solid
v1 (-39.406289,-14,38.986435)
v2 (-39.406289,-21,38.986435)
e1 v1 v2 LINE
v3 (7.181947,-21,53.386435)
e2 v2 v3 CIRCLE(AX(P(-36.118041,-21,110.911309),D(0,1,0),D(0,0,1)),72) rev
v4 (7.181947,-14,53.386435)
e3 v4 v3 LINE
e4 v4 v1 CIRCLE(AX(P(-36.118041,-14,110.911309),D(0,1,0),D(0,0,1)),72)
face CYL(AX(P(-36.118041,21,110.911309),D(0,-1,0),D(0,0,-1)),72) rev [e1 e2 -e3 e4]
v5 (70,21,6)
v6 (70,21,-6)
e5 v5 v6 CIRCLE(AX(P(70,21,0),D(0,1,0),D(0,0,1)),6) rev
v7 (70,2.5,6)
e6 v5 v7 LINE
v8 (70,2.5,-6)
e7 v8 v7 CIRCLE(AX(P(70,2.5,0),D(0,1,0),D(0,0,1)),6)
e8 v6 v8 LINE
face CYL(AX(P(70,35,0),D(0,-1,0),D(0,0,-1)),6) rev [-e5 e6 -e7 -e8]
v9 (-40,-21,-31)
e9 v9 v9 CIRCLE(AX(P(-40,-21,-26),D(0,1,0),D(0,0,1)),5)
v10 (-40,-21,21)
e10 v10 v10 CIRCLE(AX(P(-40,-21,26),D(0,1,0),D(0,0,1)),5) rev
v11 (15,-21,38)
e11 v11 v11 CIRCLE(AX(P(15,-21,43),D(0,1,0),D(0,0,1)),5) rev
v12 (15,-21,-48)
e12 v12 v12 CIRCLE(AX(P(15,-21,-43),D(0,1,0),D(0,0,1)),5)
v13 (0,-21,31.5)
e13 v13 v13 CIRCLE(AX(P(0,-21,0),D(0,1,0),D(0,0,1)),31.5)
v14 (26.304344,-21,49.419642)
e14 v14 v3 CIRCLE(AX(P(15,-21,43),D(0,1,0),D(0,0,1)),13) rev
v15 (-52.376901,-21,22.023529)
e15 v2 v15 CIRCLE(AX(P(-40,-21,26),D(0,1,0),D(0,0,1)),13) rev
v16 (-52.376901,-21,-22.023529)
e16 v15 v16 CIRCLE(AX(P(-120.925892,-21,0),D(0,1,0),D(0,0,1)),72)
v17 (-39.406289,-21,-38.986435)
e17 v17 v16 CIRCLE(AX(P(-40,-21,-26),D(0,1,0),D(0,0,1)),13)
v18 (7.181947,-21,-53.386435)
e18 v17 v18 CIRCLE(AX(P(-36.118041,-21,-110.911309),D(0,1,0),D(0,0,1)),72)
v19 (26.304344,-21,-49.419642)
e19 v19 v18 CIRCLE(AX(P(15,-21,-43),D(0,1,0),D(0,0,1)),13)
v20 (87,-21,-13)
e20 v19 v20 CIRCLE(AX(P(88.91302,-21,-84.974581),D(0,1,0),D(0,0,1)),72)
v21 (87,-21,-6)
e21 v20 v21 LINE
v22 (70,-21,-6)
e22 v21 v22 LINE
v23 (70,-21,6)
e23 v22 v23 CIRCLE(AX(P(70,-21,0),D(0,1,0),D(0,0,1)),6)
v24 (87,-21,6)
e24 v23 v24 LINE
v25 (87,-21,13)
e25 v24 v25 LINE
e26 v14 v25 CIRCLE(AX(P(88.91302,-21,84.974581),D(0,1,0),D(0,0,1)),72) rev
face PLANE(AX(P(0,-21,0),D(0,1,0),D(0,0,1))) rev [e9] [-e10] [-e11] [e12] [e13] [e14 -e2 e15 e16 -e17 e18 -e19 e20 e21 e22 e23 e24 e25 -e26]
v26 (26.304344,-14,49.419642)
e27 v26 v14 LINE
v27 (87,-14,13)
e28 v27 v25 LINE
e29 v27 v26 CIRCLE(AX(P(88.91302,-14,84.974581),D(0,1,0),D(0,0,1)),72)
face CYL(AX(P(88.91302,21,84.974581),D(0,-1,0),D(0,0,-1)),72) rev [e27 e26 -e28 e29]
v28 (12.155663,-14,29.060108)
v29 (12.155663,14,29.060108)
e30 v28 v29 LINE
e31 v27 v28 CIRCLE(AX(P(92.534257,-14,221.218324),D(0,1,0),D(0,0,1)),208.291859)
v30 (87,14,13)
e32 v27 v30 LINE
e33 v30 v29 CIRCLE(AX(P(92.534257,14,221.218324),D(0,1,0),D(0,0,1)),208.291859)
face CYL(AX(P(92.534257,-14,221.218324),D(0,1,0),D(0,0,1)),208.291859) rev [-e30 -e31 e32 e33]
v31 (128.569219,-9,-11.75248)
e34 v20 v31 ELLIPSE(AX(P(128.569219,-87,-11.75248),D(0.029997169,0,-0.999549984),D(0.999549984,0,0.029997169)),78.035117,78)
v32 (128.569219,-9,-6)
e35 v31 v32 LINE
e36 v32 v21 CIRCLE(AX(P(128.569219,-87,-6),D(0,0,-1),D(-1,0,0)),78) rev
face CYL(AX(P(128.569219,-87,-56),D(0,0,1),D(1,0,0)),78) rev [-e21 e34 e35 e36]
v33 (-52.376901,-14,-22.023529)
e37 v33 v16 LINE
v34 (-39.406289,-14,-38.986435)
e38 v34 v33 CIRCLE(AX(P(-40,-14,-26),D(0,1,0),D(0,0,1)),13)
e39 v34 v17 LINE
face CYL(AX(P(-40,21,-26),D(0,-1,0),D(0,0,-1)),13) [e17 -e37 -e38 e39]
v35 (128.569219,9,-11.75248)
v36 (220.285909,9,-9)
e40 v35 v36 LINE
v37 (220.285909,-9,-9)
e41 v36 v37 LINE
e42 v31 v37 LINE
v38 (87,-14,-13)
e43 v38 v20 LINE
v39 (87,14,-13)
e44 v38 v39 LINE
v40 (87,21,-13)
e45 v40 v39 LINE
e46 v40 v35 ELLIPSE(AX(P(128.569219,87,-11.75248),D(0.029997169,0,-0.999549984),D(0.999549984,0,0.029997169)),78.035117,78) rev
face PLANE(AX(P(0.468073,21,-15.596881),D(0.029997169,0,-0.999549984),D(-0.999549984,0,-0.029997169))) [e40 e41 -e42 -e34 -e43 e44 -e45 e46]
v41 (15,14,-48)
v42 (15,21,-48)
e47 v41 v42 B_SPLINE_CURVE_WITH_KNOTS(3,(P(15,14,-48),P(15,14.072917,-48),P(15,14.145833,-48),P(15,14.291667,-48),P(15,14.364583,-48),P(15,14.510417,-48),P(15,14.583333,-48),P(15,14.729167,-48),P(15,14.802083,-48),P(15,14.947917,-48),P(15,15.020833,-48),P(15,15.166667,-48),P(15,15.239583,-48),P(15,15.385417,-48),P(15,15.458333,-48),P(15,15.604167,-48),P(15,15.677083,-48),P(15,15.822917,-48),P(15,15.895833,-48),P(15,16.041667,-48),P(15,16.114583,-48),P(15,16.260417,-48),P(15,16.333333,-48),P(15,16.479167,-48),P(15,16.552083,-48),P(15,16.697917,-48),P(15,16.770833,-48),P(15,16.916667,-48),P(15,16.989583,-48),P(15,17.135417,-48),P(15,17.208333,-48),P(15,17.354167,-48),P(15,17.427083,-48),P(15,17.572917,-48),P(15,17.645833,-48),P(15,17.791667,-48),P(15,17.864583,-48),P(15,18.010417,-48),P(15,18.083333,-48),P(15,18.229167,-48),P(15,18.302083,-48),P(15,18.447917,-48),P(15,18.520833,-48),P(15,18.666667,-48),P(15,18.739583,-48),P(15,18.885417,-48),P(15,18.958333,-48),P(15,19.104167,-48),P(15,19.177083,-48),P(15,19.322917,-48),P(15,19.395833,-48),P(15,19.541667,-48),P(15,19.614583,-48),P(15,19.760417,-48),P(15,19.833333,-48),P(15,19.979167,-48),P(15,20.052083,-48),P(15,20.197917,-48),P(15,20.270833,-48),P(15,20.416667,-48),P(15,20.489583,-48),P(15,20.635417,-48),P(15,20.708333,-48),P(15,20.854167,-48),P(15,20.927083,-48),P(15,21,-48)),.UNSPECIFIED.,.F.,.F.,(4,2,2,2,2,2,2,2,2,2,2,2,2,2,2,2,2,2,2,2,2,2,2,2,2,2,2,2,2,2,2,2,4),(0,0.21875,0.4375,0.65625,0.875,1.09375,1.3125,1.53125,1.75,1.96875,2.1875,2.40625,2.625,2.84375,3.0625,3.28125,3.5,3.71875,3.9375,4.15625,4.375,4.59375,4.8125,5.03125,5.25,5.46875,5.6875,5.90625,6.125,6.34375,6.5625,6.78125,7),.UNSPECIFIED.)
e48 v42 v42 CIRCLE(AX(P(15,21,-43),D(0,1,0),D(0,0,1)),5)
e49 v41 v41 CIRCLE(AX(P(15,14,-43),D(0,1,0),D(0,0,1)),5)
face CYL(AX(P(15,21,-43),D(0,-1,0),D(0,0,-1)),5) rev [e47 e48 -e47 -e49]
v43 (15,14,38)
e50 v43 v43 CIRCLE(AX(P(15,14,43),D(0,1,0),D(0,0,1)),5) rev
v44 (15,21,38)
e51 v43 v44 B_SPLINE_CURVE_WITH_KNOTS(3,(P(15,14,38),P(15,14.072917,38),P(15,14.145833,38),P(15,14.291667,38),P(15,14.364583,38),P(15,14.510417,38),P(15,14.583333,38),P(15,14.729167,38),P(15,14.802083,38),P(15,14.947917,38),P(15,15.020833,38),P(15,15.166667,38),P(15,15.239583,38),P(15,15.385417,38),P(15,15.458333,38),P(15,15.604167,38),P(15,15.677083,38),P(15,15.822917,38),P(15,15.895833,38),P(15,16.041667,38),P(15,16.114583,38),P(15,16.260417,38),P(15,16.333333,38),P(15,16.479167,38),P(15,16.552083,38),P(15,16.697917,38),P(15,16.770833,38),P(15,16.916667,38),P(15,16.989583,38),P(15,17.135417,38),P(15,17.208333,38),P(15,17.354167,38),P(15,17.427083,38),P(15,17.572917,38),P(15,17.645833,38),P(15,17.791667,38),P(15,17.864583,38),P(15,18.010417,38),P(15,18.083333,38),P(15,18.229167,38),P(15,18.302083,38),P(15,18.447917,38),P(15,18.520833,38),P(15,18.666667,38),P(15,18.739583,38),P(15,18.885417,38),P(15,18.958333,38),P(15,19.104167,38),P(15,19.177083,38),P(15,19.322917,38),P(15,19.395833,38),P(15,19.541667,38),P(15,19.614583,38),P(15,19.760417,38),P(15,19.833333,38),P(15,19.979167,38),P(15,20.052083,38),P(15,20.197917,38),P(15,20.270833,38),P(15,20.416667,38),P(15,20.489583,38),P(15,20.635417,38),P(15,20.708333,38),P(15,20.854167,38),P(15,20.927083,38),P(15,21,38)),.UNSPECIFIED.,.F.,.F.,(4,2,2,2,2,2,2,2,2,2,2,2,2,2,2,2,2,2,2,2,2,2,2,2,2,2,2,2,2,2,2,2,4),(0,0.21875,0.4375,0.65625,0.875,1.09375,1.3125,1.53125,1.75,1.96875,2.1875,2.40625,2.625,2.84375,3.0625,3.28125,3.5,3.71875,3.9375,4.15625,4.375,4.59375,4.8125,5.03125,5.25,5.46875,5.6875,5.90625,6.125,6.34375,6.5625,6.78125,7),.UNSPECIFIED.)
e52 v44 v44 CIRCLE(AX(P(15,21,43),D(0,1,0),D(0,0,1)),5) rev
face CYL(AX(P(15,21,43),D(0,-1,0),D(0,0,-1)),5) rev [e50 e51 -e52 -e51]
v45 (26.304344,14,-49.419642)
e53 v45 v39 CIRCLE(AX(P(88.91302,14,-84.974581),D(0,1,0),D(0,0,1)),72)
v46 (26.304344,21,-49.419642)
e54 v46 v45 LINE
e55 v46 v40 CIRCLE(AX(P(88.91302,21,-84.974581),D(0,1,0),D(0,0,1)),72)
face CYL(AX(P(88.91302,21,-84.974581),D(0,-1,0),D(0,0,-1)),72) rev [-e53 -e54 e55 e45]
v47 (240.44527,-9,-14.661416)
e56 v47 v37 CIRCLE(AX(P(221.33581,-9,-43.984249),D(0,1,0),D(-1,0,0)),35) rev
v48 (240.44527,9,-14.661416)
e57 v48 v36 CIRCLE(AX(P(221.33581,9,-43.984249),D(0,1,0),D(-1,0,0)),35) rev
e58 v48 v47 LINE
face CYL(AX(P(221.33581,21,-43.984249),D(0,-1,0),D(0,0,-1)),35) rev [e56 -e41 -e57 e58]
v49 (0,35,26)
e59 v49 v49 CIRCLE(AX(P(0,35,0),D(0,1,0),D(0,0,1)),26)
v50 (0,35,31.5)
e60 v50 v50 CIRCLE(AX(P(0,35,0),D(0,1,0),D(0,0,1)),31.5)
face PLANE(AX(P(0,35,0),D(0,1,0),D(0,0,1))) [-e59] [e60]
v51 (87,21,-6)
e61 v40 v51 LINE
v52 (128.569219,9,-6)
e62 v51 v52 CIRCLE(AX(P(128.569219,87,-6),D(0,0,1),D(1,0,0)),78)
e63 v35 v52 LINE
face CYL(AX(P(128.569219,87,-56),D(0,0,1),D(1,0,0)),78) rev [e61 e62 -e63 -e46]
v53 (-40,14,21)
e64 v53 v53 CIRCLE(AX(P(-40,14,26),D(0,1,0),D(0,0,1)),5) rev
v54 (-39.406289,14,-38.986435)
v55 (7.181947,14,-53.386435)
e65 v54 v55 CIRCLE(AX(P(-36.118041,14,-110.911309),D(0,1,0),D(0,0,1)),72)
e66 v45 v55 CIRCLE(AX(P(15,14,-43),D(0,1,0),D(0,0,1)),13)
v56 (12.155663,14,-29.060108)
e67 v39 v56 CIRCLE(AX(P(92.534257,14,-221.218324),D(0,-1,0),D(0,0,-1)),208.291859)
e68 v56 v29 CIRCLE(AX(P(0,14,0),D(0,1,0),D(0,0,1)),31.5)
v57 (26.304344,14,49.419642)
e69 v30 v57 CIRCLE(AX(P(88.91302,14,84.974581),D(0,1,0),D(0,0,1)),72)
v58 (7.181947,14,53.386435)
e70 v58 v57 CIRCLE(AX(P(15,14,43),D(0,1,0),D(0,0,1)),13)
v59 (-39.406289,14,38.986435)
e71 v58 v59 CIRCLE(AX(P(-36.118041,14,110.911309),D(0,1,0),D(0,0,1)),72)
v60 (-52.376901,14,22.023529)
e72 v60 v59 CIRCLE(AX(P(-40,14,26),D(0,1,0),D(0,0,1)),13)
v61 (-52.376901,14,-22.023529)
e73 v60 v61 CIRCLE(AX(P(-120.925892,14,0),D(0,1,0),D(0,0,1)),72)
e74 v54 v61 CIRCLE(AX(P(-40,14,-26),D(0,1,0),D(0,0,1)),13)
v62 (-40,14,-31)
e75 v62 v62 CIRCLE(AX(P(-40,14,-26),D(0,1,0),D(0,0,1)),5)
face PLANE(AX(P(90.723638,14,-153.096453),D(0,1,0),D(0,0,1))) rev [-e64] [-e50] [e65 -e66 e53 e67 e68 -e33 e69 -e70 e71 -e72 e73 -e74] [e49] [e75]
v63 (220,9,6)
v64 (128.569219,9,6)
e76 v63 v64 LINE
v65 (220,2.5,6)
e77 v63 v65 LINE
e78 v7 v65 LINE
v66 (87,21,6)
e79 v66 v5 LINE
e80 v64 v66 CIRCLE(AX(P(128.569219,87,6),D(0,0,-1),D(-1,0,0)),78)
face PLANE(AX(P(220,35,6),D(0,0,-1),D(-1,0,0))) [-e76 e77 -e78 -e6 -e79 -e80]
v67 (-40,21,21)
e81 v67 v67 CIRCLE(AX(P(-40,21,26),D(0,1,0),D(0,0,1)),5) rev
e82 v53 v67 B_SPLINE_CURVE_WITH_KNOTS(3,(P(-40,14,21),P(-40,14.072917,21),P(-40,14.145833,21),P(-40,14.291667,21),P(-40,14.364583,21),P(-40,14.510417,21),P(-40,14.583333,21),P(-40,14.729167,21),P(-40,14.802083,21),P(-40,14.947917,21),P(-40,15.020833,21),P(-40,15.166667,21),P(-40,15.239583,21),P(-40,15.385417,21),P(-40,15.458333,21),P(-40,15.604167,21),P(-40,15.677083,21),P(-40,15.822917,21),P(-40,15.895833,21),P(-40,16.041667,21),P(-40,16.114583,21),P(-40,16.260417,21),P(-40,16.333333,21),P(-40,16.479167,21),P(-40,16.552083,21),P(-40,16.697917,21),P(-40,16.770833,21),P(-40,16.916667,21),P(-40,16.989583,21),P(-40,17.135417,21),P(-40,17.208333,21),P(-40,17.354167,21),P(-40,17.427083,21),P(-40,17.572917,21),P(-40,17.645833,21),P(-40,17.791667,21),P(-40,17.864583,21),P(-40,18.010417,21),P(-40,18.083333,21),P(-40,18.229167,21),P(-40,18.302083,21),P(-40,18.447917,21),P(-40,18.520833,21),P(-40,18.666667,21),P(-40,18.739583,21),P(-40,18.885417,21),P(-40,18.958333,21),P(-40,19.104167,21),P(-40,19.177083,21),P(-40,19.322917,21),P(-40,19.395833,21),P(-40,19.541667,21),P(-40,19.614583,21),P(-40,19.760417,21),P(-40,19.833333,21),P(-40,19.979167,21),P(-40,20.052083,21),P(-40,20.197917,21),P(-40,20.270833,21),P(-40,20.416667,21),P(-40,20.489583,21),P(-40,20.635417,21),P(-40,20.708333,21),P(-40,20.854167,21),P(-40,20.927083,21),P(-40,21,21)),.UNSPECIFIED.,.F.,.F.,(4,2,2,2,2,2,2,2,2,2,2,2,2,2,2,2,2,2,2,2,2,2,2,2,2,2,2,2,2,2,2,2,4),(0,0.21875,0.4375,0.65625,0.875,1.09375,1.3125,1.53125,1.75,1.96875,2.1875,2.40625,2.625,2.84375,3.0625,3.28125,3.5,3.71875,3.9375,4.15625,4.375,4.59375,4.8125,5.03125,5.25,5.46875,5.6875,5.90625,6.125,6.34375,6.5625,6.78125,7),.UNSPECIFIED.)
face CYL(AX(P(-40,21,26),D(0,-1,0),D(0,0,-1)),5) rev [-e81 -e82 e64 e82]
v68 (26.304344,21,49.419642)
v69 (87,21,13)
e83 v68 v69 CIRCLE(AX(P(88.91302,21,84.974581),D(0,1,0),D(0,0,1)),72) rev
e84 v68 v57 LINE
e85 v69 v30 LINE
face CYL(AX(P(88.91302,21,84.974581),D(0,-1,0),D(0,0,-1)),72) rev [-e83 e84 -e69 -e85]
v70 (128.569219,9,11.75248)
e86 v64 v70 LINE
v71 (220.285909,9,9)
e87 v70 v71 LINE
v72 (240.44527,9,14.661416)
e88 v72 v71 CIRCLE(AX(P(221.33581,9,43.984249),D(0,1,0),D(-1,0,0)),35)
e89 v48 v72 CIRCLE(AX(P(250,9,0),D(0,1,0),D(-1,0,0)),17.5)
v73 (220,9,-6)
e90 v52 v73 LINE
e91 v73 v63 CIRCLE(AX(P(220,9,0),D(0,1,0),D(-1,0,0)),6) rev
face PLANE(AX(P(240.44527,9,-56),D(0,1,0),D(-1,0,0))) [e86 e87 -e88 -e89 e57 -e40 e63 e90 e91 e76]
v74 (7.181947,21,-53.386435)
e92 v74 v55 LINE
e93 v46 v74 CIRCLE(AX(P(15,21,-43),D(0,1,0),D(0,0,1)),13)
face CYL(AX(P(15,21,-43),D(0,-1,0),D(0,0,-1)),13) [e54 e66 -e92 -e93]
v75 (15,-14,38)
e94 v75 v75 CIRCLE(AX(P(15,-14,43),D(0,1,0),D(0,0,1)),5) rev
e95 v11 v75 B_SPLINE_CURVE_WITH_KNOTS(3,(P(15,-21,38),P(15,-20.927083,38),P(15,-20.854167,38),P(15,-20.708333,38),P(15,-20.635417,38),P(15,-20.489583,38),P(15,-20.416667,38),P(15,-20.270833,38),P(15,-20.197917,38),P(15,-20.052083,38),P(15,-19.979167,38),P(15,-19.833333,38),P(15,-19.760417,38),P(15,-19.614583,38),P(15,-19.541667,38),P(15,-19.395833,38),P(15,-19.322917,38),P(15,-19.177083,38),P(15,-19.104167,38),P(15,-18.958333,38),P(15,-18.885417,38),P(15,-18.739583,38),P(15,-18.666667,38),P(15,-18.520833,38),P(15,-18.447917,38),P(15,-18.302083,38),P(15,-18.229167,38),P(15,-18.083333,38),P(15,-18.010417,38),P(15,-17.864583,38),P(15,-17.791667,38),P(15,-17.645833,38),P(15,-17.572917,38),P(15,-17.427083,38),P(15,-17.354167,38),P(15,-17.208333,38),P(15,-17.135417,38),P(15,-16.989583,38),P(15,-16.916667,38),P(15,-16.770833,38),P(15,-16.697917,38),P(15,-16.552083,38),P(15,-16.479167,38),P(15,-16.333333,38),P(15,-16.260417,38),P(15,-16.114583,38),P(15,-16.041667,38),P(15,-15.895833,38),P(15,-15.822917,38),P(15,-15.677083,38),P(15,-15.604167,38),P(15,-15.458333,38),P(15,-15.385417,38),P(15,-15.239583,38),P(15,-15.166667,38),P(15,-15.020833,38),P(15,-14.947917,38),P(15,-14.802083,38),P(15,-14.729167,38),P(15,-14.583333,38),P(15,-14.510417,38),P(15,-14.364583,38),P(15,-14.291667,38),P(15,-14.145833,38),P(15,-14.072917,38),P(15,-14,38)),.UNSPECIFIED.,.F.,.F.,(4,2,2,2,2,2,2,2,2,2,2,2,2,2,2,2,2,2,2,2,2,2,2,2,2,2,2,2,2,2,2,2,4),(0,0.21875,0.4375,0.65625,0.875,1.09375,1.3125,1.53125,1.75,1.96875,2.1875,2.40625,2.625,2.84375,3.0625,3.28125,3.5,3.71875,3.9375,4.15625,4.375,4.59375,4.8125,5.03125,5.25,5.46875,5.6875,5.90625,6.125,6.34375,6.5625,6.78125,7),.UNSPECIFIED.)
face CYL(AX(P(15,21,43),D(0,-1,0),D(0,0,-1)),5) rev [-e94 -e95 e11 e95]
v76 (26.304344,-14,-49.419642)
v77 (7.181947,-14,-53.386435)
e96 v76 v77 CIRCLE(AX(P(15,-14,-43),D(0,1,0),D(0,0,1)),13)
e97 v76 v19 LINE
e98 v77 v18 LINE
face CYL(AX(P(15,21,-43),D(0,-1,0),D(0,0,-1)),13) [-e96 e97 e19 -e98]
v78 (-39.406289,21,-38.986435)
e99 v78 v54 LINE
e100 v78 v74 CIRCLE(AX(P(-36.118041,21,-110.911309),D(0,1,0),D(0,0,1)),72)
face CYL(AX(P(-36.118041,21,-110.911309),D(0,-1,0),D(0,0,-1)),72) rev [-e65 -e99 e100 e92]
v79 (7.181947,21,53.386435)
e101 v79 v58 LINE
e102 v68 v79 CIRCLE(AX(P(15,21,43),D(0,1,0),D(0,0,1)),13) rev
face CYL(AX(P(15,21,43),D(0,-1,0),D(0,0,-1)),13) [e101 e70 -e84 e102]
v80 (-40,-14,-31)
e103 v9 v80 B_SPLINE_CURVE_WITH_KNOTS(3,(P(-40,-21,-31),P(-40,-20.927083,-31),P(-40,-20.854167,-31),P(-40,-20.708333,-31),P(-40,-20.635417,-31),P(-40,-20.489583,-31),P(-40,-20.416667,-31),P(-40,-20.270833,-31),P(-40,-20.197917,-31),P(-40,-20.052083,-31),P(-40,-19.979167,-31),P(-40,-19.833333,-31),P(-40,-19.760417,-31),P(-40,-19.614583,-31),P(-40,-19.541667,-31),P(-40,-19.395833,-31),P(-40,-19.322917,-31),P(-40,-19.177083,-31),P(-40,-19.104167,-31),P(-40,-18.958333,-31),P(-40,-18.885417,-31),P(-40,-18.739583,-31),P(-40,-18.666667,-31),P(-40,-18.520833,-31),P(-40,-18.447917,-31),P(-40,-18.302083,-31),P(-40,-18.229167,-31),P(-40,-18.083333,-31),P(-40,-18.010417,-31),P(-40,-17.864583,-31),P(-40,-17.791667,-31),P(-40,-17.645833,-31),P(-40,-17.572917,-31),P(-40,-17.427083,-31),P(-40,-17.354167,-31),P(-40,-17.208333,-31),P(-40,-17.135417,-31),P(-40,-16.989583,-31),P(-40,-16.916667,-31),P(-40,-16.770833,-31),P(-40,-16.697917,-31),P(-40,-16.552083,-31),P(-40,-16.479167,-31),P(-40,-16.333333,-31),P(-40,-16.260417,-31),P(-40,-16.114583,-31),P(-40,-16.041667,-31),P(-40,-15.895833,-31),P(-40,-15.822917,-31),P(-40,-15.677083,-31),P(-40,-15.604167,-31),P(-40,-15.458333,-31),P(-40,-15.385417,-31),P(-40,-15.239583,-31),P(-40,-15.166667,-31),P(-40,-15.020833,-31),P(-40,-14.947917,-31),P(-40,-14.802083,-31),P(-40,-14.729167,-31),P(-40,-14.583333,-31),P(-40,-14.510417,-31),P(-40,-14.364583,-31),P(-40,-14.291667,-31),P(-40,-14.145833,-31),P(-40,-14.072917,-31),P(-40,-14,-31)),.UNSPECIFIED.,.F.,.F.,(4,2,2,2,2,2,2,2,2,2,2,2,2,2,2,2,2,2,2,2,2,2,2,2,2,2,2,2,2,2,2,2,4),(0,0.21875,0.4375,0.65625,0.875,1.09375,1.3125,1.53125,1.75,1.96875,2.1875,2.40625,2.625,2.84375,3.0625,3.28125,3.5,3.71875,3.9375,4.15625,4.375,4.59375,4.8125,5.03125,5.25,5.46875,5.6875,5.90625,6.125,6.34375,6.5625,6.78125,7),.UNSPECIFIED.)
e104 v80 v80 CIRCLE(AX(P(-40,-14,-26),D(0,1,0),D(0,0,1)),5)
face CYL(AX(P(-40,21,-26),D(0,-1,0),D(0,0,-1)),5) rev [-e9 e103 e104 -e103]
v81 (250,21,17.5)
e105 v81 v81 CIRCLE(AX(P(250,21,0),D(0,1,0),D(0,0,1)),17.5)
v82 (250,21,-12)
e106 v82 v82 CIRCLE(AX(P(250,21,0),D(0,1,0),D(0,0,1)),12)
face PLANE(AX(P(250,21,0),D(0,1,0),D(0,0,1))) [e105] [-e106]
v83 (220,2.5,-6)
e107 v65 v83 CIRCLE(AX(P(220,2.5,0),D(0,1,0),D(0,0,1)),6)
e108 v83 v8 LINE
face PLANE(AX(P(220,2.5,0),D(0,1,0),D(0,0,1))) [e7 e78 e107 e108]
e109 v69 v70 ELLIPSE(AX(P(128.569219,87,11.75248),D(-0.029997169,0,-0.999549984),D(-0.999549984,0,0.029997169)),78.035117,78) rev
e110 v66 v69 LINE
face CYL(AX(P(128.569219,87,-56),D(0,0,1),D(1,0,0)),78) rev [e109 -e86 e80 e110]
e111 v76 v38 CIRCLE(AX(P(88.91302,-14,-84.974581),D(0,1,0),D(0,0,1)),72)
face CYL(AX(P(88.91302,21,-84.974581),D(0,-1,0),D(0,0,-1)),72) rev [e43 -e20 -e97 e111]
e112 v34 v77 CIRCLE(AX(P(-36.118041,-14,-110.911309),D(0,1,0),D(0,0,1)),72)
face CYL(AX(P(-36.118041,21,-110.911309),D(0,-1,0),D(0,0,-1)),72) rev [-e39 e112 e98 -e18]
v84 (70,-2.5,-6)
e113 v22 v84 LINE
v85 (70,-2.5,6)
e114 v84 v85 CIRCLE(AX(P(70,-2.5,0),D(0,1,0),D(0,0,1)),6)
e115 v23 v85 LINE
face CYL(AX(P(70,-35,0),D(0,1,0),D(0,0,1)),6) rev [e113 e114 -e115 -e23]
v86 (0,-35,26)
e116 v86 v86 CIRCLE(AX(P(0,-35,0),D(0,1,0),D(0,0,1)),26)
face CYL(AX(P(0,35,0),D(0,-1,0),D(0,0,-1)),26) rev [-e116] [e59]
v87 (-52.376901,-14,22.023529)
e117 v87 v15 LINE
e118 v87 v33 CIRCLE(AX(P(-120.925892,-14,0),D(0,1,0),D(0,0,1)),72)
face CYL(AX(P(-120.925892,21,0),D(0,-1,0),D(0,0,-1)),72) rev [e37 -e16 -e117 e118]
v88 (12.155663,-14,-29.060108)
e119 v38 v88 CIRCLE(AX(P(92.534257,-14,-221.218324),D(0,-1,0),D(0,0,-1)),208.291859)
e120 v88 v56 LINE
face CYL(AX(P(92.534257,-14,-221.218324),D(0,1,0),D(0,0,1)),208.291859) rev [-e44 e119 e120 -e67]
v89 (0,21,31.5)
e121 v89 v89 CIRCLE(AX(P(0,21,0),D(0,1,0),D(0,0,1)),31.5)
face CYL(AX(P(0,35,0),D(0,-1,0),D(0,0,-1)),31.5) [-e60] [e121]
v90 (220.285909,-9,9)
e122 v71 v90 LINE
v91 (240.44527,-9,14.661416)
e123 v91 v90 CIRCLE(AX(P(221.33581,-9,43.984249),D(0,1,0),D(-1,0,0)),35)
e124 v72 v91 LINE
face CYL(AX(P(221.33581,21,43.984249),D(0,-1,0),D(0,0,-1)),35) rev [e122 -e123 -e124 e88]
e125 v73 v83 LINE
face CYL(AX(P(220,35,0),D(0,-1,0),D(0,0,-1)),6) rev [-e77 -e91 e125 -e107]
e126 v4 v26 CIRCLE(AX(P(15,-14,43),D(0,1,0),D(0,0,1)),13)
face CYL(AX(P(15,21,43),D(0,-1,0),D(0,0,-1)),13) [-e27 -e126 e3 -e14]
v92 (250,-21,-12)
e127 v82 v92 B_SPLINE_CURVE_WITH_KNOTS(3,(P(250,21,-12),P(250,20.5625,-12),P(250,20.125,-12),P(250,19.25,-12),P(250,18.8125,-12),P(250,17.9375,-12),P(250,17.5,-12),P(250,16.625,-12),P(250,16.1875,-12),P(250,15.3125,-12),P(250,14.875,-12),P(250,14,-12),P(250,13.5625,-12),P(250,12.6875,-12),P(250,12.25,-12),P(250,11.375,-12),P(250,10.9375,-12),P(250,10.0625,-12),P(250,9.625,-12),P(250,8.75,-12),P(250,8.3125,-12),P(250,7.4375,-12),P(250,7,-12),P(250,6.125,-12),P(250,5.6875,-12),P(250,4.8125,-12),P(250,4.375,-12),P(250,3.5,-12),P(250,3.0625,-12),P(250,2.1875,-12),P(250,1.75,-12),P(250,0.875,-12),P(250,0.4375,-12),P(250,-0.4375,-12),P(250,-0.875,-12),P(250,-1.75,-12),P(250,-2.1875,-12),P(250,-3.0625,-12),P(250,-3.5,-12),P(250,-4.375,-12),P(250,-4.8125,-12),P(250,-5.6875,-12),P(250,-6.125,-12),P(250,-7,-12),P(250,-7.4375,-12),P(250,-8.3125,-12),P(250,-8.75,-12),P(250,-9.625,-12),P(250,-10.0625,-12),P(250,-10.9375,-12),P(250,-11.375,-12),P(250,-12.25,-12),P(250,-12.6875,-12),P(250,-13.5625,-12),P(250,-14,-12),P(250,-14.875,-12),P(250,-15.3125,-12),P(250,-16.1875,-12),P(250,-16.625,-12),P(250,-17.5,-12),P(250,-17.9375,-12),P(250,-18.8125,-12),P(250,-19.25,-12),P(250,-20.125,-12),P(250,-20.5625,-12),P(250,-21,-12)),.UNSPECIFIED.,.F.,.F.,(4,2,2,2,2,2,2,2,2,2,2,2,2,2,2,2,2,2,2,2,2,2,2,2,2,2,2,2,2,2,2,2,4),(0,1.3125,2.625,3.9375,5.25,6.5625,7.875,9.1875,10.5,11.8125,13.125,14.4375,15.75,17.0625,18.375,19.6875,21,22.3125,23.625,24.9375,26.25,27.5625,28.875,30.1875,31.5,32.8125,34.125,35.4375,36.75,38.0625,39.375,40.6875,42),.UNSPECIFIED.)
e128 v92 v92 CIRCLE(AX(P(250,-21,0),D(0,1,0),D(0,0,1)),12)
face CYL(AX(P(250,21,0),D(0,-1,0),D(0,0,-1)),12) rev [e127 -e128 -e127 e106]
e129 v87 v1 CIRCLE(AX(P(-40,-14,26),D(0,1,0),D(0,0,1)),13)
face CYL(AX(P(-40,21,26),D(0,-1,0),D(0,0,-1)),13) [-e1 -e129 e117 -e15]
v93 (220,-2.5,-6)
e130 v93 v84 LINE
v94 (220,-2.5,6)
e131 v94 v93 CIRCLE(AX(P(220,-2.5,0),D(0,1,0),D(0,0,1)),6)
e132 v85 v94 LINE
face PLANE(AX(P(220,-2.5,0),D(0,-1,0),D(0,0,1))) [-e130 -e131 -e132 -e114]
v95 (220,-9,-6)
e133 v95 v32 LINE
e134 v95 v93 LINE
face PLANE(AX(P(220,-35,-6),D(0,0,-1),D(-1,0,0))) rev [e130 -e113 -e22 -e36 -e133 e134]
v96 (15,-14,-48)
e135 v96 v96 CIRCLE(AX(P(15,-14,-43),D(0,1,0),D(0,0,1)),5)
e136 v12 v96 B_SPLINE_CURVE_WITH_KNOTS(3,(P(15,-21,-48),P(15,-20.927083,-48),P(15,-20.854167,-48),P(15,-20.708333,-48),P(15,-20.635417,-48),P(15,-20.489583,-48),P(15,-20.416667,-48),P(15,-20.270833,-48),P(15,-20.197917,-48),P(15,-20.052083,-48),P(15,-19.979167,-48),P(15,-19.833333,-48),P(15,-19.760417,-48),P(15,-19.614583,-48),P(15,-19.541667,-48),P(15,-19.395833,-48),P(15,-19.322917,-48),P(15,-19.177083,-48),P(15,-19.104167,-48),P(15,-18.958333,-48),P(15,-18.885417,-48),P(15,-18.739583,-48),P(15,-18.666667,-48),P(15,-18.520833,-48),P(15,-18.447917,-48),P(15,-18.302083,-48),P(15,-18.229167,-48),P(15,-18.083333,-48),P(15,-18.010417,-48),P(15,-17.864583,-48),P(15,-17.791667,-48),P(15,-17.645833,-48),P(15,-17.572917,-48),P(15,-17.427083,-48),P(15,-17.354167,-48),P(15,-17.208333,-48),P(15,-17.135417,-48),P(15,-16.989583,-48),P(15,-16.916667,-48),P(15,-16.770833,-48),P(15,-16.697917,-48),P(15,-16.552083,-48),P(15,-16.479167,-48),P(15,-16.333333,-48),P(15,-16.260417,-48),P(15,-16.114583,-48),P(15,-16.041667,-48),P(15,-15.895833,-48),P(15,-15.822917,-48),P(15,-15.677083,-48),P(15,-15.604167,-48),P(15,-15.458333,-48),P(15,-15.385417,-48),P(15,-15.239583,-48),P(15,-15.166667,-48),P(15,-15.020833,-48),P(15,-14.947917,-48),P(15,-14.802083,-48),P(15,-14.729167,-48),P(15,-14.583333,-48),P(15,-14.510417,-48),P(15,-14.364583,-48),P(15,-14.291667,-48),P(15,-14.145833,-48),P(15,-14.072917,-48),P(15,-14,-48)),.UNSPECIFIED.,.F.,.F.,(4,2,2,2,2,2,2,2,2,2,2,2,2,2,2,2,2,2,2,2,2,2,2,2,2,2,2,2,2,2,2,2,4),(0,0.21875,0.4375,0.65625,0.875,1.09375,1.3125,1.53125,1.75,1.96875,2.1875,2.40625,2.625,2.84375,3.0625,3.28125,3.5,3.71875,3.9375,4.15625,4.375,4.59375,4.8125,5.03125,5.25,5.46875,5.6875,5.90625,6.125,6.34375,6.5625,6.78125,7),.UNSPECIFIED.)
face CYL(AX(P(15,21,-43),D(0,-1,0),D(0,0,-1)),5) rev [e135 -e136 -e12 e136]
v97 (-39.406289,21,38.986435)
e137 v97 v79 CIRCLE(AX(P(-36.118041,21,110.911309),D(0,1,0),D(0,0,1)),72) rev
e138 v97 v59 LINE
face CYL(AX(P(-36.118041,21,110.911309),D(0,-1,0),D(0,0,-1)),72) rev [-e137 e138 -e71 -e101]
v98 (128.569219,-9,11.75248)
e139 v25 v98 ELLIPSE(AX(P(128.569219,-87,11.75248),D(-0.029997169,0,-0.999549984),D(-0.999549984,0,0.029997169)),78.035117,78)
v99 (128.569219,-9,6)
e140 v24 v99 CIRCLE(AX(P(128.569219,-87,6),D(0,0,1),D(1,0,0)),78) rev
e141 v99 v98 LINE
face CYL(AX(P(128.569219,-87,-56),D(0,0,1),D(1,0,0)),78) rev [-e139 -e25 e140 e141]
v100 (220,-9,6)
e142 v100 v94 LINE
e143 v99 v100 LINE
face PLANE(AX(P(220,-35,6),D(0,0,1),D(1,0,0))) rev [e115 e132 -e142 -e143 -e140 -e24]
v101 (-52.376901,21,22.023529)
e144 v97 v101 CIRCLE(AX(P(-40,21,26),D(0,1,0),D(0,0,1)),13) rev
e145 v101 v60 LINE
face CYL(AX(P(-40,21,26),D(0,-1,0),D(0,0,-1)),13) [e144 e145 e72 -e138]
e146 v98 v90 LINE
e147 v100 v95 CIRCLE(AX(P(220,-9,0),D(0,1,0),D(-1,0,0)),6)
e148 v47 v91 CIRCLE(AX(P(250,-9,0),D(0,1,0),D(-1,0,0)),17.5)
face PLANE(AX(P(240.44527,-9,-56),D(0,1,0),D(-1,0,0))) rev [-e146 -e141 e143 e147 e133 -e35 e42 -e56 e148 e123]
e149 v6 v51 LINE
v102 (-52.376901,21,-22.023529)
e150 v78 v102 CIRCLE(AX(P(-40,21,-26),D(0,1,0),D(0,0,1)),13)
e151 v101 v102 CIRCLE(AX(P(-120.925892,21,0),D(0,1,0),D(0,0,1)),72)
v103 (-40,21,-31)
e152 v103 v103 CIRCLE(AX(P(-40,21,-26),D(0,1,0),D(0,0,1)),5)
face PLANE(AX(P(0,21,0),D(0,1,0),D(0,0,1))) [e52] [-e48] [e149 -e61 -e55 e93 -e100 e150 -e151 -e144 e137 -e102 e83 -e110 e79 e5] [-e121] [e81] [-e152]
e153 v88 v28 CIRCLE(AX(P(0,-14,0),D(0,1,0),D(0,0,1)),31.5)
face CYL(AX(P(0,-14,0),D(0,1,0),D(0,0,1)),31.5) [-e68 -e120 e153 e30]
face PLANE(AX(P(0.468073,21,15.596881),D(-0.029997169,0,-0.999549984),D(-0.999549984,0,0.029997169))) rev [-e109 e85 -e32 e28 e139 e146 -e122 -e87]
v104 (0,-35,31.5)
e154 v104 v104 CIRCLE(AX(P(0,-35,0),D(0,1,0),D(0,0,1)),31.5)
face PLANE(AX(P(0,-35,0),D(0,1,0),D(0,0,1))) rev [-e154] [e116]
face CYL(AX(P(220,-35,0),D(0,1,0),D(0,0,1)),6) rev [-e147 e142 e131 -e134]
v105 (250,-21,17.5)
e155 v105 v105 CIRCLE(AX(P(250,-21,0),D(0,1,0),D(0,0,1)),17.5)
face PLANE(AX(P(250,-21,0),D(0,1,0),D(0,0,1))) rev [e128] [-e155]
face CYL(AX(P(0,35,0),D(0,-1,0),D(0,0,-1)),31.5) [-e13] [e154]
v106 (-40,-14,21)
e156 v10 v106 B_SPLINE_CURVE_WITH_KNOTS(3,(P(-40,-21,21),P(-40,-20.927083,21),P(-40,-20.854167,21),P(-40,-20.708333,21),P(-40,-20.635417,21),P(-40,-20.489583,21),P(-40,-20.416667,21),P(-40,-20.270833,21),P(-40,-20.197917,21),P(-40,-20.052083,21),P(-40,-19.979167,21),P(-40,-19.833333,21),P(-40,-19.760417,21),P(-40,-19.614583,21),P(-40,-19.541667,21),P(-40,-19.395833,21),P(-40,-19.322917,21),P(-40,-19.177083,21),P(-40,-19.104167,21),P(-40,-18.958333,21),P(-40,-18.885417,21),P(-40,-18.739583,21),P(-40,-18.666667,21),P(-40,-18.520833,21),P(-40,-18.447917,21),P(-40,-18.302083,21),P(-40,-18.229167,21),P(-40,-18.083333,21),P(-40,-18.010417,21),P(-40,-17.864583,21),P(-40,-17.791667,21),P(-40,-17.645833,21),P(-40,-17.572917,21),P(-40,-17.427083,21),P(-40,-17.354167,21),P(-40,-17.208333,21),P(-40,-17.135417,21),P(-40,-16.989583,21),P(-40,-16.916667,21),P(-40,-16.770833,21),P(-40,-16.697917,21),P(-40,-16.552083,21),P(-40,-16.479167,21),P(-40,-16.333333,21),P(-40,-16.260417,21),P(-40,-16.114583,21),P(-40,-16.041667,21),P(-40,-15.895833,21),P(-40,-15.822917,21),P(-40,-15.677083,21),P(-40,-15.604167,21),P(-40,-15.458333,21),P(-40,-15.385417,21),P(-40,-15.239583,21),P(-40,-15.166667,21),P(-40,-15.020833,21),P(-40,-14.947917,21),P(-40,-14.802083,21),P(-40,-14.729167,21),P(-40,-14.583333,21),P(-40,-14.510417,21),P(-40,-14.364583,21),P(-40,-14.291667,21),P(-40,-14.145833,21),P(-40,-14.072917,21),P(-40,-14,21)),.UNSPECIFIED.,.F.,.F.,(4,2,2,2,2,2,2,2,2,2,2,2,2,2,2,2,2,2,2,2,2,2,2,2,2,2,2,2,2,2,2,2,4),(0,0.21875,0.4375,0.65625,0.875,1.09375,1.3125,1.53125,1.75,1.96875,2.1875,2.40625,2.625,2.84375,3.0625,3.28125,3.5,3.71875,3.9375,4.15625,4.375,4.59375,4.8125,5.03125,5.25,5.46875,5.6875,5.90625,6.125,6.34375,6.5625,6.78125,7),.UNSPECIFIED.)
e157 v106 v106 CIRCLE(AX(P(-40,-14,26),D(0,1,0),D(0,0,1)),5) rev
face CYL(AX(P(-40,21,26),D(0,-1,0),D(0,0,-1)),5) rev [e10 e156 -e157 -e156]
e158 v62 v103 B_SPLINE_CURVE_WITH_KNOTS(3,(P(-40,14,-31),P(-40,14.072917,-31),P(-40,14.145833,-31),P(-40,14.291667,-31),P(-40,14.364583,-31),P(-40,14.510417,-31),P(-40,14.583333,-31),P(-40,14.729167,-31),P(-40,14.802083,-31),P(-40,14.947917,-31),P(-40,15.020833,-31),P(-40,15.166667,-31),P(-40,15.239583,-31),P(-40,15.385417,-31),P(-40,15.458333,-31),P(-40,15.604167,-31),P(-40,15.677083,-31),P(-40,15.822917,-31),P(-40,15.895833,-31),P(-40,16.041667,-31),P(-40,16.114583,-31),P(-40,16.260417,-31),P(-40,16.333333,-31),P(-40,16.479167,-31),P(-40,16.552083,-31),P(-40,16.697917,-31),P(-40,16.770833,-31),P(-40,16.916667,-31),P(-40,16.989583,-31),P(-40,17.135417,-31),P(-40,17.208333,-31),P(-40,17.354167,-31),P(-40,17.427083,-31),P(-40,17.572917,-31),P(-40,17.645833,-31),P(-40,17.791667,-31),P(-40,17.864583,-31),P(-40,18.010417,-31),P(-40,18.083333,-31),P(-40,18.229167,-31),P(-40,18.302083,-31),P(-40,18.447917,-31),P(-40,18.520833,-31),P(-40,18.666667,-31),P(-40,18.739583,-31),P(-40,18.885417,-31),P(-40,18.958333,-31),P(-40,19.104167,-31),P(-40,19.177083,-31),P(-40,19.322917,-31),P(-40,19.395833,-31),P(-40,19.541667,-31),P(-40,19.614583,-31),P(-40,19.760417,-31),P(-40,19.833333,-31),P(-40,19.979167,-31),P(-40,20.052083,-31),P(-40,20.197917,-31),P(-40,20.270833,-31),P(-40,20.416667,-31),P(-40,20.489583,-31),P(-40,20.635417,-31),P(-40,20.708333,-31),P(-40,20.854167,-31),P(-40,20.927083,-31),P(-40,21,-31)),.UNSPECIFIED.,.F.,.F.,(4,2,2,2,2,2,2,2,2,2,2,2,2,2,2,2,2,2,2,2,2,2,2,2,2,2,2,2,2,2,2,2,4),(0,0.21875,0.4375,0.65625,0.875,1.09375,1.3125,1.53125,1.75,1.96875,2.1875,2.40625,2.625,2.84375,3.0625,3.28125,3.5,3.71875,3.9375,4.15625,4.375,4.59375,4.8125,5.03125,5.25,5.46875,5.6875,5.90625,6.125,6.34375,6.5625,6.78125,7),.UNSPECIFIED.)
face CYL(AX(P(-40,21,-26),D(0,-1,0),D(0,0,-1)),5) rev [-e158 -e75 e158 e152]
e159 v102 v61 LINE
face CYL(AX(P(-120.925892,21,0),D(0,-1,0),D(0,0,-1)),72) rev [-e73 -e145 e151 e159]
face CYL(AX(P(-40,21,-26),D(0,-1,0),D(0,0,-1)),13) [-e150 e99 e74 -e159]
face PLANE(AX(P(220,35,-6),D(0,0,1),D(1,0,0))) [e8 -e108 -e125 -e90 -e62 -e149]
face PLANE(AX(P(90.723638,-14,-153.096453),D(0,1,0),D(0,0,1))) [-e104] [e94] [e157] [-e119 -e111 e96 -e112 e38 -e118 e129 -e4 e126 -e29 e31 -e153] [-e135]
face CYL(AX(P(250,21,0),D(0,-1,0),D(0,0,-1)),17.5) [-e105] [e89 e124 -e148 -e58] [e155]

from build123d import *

# Parameters (mm, degrees)
SKETCH1_R               = 31.5
SKETCH1_R_2             = 26
BOSS_EXTRUDE1_DEPTH     = 35
SKETCH1_3_R             = 31.5
SKETCH1_3_R_2           = 26
BOSS_EXTRUDE2_DEPTH     = 21
SKETCH2_R               = 5
BOSS_EXTRUDE7_DEPTH     = 21
CUT_EXTRUDE3_DEPTH      = 250.349008072
CUT_EXTRUDE3_DEPTH_BACK = 250.349008072
SKETCH2_6_R             = 17.5
SKETCH2_6_R_2           = 12
BOSS_EXTRUDE8_DEPTH     = 21
CUT_EXTRUDE4_START      = 2.5
CUT_EXTRUDE4_DEPTH      = 18.5
CUT_EXTRUDE5_DEPTH      = 14
CUT_EXTRUDE7_DEPTH      = 276.530851267
CUT_EXTRUDE7_DEPTH_BACK = 276.530851267
SKETCH1_5_R             = 26


# Read off the part's stored shape, not the designer's step: Cut-Extrude4
with BuildPart() as part:
    # Sketch1 → Boss-Extrude1 (new, symmetric)
    with BuildSketch(Plane(origin=(0, 0, 0), x_dir=(1, 0, 0), z_dir=(0, 1, 0))):
        with Locations(Location((0, 0, 0), (0, 0, 270))):
            Circle(SKETCH1_R)
        with Locations(Location((0, 0, 0), (0, 0, 270))):
            Circle(SKETCH1_R_2, mode=Mode.SUBTRACT)
    extrude(amount=BOSS_EXTRUDE1_DEPTH, both=True)

    # Sketch1<3> → Boss-Extrude2 (add, symmetric)
    with BuildSketch(Plane(origin=(0, 0, 0), x_dir=(1, 0, 0), z_dir=(0, 1, 0))):
        with Locations(Location((0, 0, 0), (0, 0, 270))):
            Circle(SKETCH1_3_R)
        with Locations(Location((0, 0, 0), (0, 0, 270))):
            Circle(SKETCH1_3_R_2, mode=Mode.SUBTRACT)
    extrude(amount=BOSS_EXTRUDE2_DEPTH, both=True)

    # Sketch2 → Boss-Extrude7 (add, symmetric)
    with BuildSketch(Plane(origin=(0, 0, 0), x_dir=(1, 0, 0), z_dir=(0, 1, 0))):
        with BuildLine():
            Line((220.285908843, 9), (87, 13))
            ThreePointArc((87, 13), (51.867643982, 23.236099658), (26.304344234, 49.419641847))
            ThreePointArc((26.304344234, 49.419641847), (17.640533854, 55.729005498), (7.181946677, 53.386435492))
            ThreePointArc((7.181946677, 53.386435492), (-14.855989459, 42.122318837), (-39.406288617, 38.986435492))
            ThreePointArc((-39.406288617, 38.986435492), (-50.326951915, 33.896458963), (-52.376901133, 22.023529412))
            ThreePointArc((-52.376901133, 22.023529412), (-48.925892025, 0), (-52.376901133, -22.023529412))
            ThreePointArc((-52.376901133, -22.023529412), (-50.326951915, -33.896458963), (-39.406288617, -38.986435492))
            ThreePointArc((-39.406288617, -38.986435492), (-14.855989459, -42.122318837), (7.181946677, -53.386435492))
            ThreePointArc((7.181946677, -53.386435492), (17.640533854, -55.729005498), (26.304344234, -49.419641847))
            ThreePointArc((26.304344234, -49.419641847), (51.867643982, -23.236099658), (87, -13))
            Line((87, -13), (220.285908843, -9))
            ThreePointArc((220.285908843, -9), (230.798886909, -10.287807913), (240.445269919, -14.661416476))
            ThreePointArc((240.445269919, -14.661416476), (232.5, 0), (240.445269919, 14.661416476))
            ThreePointArc((240.445269919, 14.661416476), (230.798886909, 10.287807913), (220.285908843, 9))
        make_face()
        with Locations(Location((15, 43, 0), (0, 0, 90))):
            Circle(SKETCH2_R, mode=Mode.SUBTRACT)
        with Locations(Location((15, -43, 0), (0, 0, 90))):
            Circle(SKETCH2_R, mode=Mode.SUBTRACT)
        with Locations(Location((-40, -26, 0), (0, 0, 90))):
            Circle(SKETCH2_R, mode=Mode.SUBTRACT)
        with Locations(Location((-40, 26, 0), (0, 0, 90))):
            Circle(SKETCH2_R, mode=Mode.SUBTRACT)
    extrude(amount=BOSS_EXTRUDE7_DEPTH, both=True)

    # Sketch6 → Cut-Extrude3 (cut, two sides: drawn at the far end of the back side and taken through both)
    with BuildSketch(Plane.XY.offset(-CUT_EXTRUDE3_DEPTH_BACK)):
        with BuildLine():
            Line((240.445269919, 21), (220.285908843, 21))
            Line((220.285908843, 21), (87, 21))
            ThreePointArc((87, 21), (106.935911729, 12.060024019), (128.569219382, 9))
            Line((128.569219382, 9), (240.445269919, 9))
            Line((240.445269919, 9), (240.445269919, 21))
        make_face()
        with BuildLine():
            Line((240.445269919, -9), (128.569219382, -9))
            ThreePointArc((128.569219382, -9), (106.935911729, -12.060024019), (87, -21))
            Line((87, -21), (240.445269919, -21))
            Line((240.445269919, -21), (240.445269919, -9))
        make_face()
    extrude(amount=CUT_EXTRUDE3_DEPTH + CUT_EXTRUDE3_DEPTH_BACK, mode=Mode.SUBTRACT)

    # Sketch2<6> → Boss-Extrude8 (add, symmetric)
    with BuildSketch(Plane(origin=(0, 0, 0), x_dir=(1, 0, 0), z_dir=(0, 1, 0))):
        with Locations(Location((250, 0, 0), (0, 0, 270))):
            Circle(SKETCH2_6_R)
        with Locations(Location((250, 0, 0), (0, 0, 90))):
            Circle(SKETCH2_6_R_2, mode=Mode.SUBTRACT)
    extrude(amount=BOSS_EXTRUDE8_DEPTH, both=True)

    # Cut-Extrude4 outline → Cut-Extrude4 (cut)
    with BuildSketch(Plane(origin=(0, 0, 0), x_dir=(1, 0, 0), z_dir=(0, 1, 0)).offset(CUT_EXTRUDE4_START)):
        with BuildLine():
            ThreePointArc((220, -6), (226, 0), (220, 6))
            Line((220, 6), (70, 6))
            ThreePointArc((70, 6), (64, 0), (70, -6))
            Line((70, -6), (220, -6))
        make_face()
    cut_extrude4 = extrude(amount=CUT_EXTRUDE4_DEPTH, mode=Mode.SUBTRACT)

    # Mirror3: Cut-Extrude4 across plane
    add(cut_extrude4.mirror(Plane.ZX), mode=Mode.SUBTRACT)

    # Sketch9 → Cut-Extrude5 (cut, symmetric)
    with BuildSketch(Plane(origin=(0, 0, 0), x_dir=(1, 0, 0), z_dir=(0, 1, 0))):
        with BuildLine():
            ThreePointArc((87, -13), (48.833727891, -17.562334102), (12.155663261, -29.060107548))
            ThreePointArc((12.155663261, -29.060107548), (-31.5, 0), (12.155663261, 29.060107548))
            ThreePointArc((12.155663261, 29.060107548), (48.833727891, 17.562334102), (87, 13))
            ThreePointArc((87, 13), (51.867643982, 23.236099658), (26.304344234, 49.419641847))
            ThreePointArc((26.304344234, 49.419641847), (17.640533854, 55.729005498), (7.181946677, 53.386435492))
            ThreePointArc((7.181946677, 53.386435492), (-14.855989459, 42.122318837), (-39.406288617, 38.986435492))
            ThreePointArc((-39.406288617, 38.986435492), (-50.326951915, 33.896458963), (-52.376901133, 22.023529412))
            ThreePointArc((-52.376901133, 22.023529412), (-48.925892025, 0), (-52.376901133, -22.023529412))
            ThreePointArc((-52.376901133, -22.023529412), (-50.326951915, -33.896458963), (-39.406288617, -38.986435492))
            ThreePointArc((-39.406288617, -38.986435492), (-14.855989459, -42.122318837), (7.181946677, -53.386435492))
            ThreePointArc((7.181946677, -53.386435492), (17.640533854, -55.729005498), (26.304344234, -49.419641847))
            ThreePointArc((26.304344234, -49.419641847), (51.867643982, -23.236099658), (87, -13))
        make_face()
    extrude(amount=CUT_EXTRUDE5_DEPTH, both=True, mode=Mode.SUBTRACT)

    # Sketch1<5> → Cut-Extrude7 (cut, two sides: drawn at the far end of the back side and taken through both)
    with BuildSketch(Plane(origin=(0, 0, 0), x_dir=(1, 0, 0), z_dir=(0, 1, 0)).offset(-CUT_EXTRUDE7_DEPTH_BACK)):
        with Locations(Location((0, 0, 0), (0, 0, 270))):
            Circle(SKETCH1_5_R)
    extrude(amount=CUT_EXTRUDE7_DEPTH + CUT_EXTRUDE7_DEPTH_BACK, mode=Mode.SUBTRACT)


solid = part.part
